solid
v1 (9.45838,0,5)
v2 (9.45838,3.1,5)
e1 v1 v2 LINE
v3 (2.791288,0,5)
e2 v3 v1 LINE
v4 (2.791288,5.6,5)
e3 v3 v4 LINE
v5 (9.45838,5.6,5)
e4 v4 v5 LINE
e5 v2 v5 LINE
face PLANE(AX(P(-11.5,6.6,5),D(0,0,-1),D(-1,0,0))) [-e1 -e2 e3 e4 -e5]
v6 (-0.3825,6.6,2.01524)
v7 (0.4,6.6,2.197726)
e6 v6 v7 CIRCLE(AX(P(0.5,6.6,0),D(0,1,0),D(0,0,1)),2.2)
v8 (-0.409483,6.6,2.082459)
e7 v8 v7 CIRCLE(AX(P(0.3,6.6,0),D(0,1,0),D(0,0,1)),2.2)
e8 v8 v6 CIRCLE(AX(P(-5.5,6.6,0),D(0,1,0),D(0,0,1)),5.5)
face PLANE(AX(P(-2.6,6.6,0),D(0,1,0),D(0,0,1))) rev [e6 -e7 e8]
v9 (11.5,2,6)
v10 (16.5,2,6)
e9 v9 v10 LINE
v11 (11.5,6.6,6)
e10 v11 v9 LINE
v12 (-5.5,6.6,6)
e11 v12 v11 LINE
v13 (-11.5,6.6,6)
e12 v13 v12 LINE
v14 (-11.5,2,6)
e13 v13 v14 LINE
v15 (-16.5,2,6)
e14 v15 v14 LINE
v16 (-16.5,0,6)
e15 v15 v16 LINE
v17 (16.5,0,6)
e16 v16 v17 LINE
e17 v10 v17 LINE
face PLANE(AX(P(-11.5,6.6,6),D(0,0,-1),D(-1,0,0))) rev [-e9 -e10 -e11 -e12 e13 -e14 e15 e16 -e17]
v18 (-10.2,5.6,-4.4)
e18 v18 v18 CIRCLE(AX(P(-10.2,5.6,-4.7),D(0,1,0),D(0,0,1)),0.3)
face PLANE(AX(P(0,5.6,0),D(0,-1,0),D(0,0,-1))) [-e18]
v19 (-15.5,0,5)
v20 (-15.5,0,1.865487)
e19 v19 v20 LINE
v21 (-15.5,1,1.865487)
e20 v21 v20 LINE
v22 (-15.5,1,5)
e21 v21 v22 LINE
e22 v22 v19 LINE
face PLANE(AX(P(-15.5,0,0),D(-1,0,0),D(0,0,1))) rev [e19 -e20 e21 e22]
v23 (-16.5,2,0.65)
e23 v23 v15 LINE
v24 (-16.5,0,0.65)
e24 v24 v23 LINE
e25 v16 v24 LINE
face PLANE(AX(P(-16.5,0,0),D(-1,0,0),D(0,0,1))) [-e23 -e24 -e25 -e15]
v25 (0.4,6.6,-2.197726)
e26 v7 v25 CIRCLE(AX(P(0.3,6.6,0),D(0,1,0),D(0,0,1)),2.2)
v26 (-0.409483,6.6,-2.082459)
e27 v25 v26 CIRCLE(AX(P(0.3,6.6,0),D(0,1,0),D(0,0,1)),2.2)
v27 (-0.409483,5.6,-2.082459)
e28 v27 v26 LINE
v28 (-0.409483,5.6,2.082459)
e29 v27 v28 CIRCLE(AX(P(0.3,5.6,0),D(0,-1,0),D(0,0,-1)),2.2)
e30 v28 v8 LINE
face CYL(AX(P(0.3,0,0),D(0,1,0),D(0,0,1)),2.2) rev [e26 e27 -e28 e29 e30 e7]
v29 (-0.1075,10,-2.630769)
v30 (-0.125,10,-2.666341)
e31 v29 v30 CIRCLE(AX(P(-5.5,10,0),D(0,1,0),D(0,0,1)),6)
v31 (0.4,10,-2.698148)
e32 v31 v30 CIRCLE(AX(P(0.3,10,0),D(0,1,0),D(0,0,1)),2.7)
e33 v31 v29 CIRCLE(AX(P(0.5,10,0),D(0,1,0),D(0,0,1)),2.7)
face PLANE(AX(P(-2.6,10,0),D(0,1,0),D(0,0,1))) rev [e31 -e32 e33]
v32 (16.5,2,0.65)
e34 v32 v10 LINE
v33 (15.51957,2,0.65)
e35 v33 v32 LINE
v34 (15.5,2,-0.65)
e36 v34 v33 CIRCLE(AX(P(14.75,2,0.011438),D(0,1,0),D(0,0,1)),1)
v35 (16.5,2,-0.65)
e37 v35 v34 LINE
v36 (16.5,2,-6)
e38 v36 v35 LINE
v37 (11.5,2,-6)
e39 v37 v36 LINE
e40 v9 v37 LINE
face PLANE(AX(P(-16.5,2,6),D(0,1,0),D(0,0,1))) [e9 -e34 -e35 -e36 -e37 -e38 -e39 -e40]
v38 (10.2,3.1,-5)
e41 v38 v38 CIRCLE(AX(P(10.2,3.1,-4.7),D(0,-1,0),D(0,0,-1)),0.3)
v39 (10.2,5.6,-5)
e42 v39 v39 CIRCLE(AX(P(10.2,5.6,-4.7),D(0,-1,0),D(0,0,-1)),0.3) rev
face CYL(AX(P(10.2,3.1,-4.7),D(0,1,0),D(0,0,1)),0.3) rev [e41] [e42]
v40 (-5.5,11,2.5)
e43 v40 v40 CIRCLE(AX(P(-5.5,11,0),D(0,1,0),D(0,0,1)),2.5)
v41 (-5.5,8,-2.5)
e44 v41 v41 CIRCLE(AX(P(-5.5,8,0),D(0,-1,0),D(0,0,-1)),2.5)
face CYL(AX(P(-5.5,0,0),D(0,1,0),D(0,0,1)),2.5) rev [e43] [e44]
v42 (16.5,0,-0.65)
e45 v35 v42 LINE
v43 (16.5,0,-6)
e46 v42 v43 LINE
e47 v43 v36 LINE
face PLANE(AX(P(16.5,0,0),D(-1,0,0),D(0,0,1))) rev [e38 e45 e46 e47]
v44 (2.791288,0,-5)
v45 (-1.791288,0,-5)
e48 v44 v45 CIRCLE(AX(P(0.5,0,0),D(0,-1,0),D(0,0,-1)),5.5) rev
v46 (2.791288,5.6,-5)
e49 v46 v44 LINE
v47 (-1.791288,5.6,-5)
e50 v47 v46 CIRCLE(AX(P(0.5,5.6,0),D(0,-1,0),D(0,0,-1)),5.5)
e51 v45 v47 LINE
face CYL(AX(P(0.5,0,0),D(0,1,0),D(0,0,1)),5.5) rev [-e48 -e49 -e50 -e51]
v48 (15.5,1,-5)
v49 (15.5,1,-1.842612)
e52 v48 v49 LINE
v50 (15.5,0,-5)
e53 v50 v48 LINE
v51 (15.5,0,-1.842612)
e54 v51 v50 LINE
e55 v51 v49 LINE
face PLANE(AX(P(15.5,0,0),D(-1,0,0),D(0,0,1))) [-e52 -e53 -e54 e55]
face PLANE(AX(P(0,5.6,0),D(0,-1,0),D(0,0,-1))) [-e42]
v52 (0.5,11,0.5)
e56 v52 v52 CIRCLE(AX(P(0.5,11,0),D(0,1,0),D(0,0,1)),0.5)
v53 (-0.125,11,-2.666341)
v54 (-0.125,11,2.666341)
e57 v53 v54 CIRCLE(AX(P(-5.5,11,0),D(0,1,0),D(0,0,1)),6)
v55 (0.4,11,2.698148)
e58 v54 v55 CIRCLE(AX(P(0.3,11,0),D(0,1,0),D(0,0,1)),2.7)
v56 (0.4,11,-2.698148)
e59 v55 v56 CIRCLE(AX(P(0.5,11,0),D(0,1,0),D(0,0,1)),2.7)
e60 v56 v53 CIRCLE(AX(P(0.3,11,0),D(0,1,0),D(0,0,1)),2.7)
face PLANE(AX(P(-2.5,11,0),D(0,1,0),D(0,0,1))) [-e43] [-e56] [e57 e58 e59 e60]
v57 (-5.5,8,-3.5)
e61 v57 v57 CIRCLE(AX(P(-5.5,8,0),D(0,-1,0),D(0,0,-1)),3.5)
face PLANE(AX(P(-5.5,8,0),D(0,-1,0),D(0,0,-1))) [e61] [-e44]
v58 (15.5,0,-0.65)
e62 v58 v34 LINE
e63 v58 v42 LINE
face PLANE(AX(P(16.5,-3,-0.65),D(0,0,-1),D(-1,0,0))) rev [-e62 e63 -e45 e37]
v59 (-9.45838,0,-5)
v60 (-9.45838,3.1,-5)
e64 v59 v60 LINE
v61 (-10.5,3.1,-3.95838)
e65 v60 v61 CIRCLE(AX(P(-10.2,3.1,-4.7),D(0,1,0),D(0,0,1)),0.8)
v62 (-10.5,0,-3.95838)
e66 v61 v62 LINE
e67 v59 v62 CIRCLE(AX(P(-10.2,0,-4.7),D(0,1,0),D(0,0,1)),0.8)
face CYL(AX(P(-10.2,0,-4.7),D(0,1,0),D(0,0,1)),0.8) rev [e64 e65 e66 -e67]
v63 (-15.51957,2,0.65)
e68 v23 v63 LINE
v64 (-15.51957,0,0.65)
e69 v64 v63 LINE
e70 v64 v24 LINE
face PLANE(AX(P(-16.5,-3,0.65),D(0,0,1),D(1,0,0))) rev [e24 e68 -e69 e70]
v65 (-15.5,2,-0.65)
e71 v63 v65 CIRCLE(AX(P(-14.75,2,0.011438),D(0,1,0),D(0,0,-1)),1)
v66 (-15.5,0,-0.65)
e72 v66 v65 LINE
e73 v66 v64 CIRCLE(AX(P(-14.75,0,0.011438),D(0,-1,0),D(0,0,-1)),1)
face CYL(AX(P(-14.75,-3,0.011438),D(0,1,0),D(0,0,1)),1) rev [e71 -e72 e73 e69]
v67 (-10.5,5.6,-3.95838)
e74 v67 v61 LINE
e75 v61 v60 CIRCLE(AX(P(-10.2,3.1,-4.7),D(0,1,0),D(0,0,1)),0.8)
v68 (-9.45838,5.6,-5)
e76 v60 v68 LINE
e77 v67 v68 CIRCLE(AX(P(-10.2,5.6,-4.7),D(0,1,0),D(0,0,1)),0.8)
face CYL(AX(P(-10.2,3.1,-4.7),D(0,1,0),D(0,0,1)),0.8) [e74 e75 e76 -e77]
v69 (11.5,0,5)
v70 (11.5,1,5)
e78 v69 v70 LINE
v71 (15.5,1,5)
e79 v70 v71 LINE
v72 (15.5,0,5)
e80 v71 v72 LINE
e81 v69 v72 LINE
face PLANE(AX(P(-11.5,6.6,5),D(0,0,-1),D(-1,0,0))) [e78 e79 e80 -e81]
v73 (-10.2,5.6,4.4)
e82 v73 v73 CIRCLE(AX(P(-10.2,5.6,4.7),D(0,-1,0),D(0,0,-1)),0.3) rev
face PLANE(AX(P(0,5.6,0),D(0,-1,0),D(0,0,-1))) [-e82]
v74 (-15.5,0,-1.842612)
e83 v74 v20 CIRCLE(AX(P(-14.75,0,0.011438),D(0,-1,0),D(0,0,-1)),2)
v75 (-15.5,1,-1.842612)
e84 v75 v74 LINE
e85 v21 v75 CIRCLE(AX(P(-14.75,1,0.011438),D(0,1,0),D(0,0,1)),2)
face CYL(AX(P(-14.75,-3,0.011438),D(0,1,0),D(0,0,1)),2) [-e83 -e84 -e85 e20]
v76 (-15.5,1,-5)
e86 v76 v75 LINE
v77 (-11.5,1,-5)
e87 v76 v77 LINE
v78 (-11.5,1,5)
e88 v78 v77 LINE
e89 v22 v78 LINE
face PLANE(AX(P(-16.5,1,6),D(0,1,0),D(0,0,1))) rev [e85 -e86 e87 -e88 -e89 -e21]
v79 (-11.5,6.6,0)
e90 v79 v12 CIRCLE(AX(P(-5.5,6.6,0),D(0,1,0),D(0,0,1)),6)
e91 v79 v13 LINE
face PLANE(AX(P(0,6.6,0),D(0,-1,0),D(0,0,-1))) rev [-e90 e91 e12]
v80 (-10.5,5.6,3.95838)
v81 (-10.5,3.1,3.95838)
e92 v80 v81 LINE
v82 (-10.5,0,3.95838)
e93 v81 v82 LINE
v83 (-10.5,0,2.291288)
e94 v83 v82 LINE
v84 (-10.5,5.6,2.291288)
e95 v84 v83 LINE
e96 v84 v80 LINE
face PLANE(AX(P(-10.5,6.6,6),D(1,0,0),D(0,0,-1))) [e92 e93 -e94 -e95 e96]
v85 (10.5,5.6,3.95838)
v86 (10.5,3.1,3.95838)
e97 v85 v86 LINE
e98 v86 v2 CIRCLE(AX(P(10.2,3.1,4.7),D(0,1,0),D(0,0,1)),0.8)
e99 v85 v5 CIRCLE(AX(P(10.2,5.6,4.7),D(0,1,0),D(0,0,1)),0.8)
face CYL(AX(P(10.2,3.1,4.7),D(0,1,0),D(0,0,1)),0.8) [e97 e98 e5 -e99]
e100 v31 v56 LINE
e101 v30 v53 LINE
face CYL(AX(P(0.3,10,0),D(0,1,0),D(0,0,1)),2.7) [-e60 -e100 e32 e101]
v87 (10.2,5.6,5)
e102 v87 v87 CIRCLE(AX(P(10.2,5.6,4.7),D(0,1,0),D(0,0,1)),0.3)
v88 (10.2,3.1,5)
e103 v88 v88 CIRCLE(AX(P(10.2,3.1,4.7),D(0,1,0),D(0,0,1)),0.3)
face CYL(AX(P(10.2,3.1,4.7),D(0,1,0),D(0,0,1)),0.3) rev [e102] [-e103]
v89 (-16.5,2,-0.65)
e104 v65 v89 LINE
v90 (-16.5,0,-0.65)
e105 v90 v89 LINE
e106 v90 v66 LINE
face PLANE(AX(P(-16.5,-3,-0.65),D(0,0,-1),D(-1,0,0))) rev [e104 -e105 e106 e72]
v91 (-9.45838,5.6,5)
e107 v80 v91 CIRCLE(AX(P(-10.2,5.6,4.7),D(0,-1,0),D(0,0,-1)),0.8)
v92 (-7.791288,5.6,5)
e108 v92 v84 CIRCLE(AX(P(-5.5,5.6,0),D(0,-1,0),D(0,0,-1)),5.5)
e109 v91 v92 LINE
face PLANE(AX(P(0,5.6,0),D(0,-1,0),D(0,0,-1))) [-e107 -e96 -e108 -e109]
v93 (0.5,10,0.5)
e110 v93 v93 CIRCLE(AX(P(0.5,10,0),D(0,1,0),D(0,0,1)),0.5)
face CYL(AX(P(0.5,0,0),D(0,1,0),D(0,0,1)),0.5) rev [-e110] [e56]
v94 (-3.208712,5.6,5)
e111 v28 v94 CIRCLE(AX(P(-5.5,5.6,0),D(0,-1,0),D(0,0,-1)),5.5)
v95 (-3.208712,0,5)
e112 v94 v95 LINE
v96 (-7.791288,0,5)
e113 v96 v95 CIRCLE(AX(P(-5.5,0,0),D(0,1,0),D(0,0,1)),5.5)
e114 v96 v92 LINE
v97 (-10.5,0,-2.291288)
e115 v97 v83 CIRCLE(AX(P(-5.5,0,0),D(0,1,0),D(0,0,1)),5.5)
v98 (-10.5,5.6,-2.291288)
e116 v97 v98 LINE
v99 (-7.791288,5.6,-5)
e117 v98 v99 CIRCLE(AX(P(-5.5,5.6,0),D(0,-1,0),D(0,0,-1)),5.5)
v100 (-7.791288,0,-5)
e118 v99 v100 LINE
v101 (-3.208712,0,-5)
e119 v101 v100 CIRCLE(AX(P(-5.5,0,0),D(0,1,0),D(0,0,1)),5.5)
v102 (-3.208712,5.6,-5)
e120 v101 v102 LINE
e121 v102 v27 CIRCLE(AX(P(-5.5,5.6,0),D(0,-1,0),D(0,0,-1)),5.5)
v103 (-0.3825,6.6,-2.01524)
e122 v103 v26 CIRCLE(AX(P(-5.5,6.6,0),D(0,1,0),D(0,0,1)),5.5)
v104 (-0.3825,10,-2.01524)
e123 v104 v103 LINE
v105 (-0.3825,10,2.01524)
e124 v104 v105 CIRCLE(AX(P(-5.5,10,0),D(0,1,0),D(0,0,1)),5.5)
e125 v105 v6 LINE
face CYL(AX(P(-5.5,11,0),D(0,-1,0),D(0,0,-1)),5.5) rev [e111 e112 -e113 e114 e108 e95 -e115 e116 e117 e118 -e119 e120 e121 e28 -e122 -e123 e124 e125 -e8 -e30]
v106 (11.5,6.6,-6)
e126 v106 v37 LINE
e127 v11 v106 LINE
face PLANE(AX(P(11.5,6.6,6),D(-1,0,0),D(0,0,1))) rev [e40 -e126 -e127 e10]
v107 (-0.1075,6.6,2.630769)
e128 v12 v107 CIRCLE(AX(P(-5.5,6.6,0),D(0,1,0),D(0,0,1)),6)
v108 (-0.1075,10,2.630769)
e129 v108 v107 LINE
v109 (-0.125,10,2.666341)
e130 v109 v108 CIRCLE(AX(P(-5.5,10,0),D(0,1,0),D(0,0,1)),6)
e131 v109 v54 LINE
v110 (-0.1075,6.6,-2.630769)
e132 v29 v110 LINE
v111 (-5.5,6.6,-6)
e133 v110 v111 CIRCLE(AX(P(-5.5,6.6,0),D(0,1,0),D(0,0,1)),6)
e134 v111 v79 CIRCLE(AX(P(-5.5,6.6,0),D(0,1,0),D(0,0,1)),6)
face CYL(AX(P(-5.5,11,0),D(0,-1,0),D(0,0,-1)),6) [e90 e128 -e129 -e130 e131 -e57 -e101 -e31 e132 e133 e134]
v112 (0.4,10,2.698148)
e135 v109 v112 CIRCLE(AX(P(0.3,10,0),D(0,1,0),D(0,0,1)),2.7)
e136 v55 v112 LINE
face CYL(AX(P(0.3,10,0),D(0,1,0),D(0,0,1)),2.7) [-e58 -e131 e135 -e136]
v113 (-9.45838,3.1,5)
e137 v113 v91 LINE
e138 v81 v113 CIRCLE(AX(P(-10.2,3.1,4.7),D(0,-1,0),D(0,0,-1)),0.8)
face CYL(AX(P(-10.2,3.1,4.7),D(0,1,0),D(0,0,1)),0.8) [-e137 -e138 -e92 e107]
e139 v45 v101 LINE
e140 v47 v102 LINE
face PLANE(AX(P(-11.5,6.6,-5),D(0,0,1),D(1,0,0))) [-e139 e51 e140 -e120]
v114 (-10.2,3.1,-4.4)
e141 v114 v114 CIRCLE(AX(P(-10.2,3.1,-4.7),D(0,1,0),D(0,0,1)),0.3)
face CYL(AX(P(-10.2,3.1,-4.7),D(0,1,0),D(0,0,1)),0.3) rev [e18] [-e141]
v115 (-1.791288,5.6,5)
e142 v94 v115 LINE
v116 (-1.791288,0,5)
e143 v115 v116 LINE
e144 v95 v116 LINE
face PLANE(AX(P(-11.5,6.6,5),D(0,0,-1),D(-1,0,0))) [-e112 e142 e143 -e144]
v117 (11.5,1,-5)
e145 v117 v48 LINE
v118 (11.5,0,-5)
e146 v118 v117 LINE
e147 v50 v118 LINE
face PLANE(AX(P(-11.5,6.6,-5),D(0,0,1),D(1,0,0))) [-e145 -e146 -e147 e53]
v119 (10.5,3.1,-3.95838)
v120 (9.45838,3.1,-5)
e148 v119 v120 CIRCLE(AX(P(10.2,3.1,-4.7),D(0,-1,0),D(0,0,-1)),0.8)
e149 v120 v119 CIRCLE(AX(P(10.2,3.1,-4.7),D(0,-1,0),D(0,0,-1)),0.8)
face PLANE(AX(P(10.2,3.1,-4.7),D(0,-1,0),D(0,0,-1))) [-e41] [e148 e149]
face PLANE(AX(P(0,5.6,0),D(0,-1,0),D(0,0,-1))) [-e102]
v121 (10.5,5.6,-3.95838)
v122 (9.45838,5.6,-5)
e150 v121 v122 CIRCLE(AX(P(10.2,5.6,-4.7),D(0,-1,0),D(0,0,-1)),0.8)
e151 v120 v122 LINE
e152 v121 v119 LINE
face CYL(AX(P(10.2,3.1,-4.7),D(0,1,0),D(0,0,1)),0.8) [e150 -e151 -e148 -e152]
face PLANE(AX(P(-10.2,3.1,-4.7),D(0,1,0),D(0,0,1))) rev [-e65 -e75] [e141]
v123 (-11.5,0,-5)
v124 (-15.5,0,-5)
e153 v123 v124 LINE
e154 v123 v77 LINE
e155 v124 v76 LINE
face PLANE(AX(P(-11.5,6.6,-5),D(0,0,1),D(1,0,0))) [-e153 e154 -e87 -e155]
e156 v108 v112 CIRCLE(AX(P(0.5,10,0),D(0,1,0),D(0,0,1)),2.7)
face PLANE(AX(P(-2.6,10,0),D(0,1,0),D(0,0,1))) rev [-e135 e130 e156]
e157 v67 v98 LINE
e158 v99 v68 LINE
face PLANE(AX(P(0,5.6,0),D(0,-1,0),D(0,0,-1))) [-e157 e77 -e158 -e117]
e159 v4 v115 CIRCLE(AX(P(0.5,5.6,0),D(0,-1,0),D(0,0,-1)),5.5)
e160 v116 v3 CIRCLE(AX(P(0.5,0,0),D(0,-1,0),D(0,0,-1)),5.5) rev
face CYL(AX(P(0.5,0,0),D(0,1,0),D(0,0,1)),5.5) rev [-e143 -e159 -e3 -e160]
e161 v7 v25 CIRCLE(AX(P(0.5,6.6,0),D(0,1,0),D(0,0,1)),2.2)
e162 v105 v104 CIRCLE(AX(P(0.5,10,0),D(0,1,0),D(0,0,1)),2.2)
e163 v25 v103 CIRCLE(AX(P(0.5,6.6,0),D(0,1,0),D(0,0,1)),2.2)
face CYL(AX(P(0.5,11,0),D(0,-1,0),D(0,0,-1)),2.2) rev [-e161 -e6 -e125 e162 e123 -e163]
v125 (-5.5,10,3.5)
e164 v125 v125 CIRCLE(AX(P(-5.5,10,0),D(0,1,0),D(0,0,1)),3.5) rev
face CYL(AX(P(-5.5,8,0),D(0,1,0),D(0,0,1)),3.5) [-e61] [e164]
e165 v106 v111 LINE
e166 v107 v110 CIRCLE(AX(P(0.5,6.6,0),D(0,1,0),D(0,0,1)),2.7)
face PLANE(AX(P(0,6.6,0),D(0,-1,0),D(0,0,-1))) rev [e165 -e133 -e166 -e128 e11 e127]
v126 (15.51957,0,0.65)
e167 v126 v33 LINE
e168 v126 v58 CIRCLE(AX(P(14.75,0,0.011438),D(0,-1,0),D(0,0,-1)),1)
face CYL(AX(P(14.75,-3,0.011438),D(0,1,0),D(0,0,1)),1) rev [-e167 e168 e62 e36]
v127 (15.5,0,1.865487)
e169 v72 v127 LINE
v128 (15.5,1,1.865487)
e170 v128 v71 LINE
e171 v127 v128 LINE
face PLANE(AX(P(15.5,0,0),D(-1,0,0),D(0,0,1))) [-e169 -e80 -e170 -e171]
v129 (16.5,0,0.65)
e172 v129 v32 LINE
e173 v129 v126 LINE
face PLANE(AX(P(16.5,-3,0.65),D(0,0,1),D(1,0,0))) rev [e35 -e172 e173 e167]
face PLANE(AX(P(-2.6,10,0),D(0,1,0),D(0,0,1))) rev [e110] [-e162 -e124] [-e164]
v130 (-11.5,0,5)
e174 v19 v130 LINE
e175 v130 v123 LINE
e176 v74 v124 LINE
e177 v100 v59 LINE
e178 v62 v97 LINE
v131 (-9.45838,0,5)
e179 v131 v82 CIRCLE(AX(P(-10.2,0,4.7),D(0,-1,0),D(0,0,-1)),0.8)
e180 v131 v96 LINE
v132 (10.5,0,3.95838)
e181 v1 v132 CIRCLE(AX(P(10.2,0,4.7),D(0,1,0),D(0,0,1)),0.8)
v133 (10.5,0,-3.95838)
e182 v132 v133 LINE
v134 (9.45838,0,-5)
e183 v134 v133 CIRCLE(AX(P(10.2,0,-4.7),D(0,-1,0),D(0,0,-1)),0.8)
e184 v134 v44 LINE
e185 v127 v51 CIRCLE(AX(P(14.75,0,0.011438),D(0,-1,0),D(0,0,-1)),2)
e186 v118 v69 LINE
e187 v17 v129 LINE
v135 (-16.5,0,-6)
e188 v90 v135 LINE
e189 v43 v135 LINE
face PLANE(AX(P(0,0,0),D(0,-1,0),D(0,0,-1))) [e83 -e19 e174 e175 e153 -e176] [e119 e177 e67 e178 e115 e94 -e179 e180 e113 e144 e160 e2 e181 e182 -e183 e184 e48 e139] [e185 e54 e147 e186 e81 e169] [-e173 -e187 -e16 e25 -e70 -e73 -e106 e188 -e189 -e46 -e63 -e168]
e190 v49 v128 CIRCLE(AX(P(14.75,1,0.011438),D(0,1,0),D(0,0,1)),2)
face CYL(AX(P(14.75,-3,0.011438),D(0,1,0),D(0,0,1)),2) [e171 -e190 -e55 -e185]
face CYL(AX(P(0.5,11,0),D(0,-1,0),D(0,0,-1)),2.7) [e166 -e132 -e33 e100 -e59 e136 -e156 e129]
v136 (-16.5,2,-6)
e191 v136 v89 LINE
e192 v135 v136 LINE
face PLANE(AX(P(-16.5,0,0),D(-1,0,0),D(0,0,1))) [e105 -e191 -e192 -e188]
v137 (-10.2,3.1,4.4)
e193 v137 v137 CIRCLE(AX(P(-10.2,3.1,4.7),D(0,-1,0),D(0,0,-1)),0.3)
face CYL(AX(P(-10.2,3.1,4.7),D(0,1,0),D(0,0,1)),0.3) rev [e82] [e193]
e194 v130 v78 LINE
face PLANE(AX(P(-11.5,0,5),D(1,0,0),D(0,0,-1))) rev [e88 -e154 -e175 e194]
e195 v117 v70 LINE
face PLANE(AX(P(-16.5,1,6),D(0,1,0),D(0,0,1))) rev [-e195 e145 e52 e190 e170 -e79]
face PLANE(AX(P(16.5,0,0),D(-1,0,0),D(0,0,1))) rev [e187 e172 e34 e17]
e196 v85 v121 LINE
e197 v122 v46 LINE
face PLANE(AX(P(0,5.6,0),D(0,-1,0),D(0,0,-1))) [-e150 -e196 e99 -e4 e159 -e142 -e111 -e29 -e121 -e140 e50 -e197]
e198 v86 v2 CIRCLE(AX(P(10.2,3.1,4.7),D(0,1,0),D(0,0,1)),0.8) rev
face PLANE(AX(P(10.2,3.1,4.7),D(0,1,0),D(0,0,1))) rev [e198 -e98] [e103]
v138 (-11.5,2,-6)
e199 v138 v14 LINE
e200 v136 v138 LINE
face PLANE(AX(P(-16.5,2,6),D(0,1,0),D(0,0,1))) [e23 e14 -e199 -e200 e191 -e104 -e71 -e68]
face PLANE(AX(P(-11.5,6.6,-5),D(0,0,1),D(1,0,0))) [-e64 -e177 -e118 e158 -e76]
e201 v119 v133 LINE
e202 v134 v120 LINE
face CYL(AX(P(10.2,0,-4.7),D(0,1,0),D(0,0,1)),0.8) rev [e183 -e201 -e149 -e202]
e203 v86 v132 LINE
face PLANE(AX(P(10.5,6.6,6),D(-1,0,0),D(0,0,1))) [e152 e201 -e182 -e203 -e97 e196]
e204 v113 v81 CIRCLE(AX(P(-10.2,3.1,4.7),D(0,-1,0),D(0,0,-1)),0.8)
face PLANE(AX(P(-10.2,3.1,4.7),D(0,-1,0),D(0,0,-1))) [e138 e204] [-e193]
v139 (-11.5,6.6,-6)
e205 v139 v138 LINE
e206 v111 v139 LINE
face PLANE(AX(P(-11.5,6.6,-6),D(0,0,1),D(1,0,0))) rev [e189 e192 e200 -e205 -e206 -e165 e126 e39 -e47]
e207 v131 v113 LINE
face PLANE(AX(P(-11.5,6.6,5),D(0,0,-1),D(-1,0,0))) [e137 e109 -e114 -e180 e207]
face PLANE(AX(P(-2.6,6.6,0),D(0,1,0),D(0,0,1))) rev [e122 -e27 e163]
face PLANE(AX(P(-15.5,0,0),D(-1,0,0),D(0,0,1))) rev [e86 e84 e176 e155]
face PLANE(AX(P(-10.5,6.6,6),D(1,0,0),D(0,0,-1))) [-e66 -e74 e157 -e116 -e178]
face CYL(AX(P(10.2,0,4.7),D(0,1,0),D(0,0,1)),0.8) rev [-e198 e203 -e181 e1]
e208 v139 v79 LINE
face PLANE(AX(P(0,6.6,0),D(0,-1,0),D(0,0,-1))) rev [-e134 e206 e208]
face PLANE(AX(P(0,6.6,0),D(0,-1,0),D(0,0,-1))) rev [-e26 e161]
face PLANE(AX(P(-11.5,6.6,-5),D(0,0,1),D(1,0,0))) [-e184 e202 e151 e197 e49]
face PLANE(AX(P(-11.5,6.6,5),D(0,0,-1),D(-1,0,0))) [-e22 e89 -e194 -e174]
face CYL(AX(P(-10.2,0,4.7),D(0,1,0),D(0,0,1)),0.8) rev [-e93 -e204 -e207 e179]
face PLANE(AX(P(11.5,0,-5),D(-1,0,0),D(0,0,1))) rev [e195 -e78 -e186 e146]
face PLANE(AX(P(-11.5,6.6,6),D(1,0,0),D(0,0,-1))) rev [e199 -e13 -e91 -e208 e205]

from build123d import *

# Parameters (mm, degrees)
SKETCH1_W                = 23
SKETCH1_H                = 12
BOSS_EXTRUDE1_DEPTH      = 6.6
BOSS_EXTRUDE2_DEPTH      = 5
BOSS_EXTRUDE2_DEPTH_BACK = 28
SKETCH2_W                = 12
SKETCH2_H                = 2
CUT_EXTRUDE1_DEPTH       = 5
SHELL3_OUTLINE_W         = 21
SHELL3_OUTLINE_H         = 10
SHELL3_DEPTH             = 5.6
SHELL3_2_DEPTH           = 1
SKETCH5_W                = 1
SKETCH5_H                = 10
BOSS_EXTRUDE4_DEPTH      = 1
SKETCH5_3_W              = 1
SKETCH5_3_H              = 10
BOSS_EXTRUDE5_DEPTH      = 1
BOSS_EXTRUDE6_DEPTH      = 4.4
CUT_EXTRUDE2_DEPTH       = 19.756598839
BOSS_EXTRUDE7_START      = -1
BOSS_EXTRUDE7_DEPTH      = 1
SKETCH21_R               = 2.5
SKETCH21_R_2             = 0.5
CUT_EXTRUDE3_DEPTH       = 21.718349355
SKETCH22_R               = 5.5
SKETCH22_R_2             = 0.8
CUT_EXTRUDE4_DEPTH       = 19.42851052
SKETCH23_R               = 0.8
SKETCH23_R_2             = 0.3
BOSS_EXTRUDE9_DEPTH      = 2.5
SKETCH25_R               = 3.5
SKETCH25_R_2             = 2.5
BOSS_EXTRUDE10_DEPTH     = 2


# Read off the part's stored shape, not the designer's step: Shell3
with BuildPart() as part:
    # Sketch1 → Boss-Extrude1 (new body)
    with BuildSketch(Plane(origin=(0, 0, 0), x_dir=(1, 0, 0), z_dir=(0, 1, 0))):
        Rectangle(SKETCH1_W, SKETCH1_H)
    extrude(amount=BOSS_EXTRUDE1_DEPTH)

    # Sketch2 → Boss-Extrude2 (add, two sides: drawn at the far end of the back side and taken through both)
    with BuildSketch(Plane(origin=(11.5, 0, 0), x_dir=(0, 0, -1), z_dir=(1, 0, 0)).offset(-BOSS_EXTRUDE2_DEPTH_BACK)):
        with Locations((0, 1)):
            Rectangle(SKETCH2_W, SKETCH2_H)
    extrude(amount=BOSS_EXTRUDE2_DEPTH + BOSS_EXTRUDE2_DEPTH_BACK)

    # Sketch3 → Cut-Extrude1 (cut)
    with BuildSketch(Plane(origin=(0, 2, 0), x_dir=(1, 0, 0), z_dir=(0, 1, 0))):
        with BuildLine():
            Line((16.5, 0.65), (15.5, 0.65))
            ThreePointArc((15.5, 0.65), (13.750113293, -0.026490152), (15.519570239, -0.65))
            Line((15.519570239, -0.65), (16.5, -0.65))
            Line((16.5, -0.65), (16.5, 0.65))
        make_face()
        with BuildLine():
            Line((-16.5, -0.65), (-16.5, 0.65))
            Line((-16.5, 0.65), (-15.5, 0.65))
            ThreePointArc((-15.5, 0.65), (-13.750113293, -0.026490152), (-15.519570239, -0.65))
            Line((-15.519570239, -0.65), (-16.5, -0.65))
        make_face()
    extrude(amount=-CUT_EXTRUDE1_DEPTH, mode=Mode.SUBTRACT)

    # Shell3 outline → Shell3 (cut)
    with BuildSketch(Plane(origin=(0, 0, 0), x_dir=(1, 0, 0), z_dir=(0, 1, 0))):
        Rectangle(SHELL3_OUTLINE_W, SHELL3_OUTLINE_H)
    extrude(amount=SHELL3_DEPTH, mode=Mode.SUBTRACT)

    # Shell3 2 outline → Shell3 2 (cut)
    with BuildSketch(Plane(origin=(0, 0, 0), x_dir=(1, 0, 0), z_dir=(0, 1, 0))):
        with BuildLine():
            ThreePointArc((-15.5, 1.842611794), (-12.75, -0.011437828), (-15.5, -1.86548745))
            Line((-15.5, -1.86548745), (-15.5, -5))
            Line((-15.5, -5), (-10.5, -5))
            Line((-10.5, -5), (-10.5, 5))
            Line((-10.5, 5), (-15.5, 5))
            Line((-15.5, 5), (-15.5, 1.842611794))
        make_face()
        with BuildLine():
            Line((10.5, 5), (10.5, -5))
            Line((10.5, -5), (15.5, -5))
            Line((15.5, -5), (15.5, -1.86548745))
            ThreePointArc((15.5, -1.86548745), (12.75, -0.011437828), (15.5, 1.842611794))
            Line((15.5, 1.842611794), (15.5, 5))
            Line((15.5, 5), (10.5, 5))
        make_face()
    extrude(amount=SHELL3_2_DEPTH, mode=Mode.SUBTRACT)

    # Sketch5 → Boss-Extrude4 (add)
    with BuildSketch(Plane.XZ.offset(-1)):
        with Locations((11, 0)):
            Rectangle(SKETCH5_W, SKETCH5_H)
    extrude(amount=BOSS_EXTRUDE4_DEPTH)

    # Sketch5<3> → Boss-Extrude5 (add)
    with BuildSketch(Plane.XZ.offset(-1)):
        with Locations((11, 0)):
            Rectangle(SKETCH5_3_W, SKETCH5_3_H)
        with Locations((-11, 0)):
            Rectangle(SKETCH5_3_W, SKETCH5_3_H)
    extrude(amount=BOSS_EXTRUDE5_DEPTH)

    # Sketch7 → Boss-Extrude6 (add)
    with BuildSketch(Plane(origin=(0, 6.6, 0), x_dir=(1, 0, 0), z_dir=(0, 1, 0))):
        with BuildLine():
            ThreePointArc((-0.1075, 2.630768661), (-11.5, 0), (-0.1075, -2.630768661))
            ThreePointArc((-0.1075, -2.630768661), (3.2, 0), (-0.1075, 2.630768661))
        make_face()
        with BuildLine():
            ThreePointArc((-0.3825, -2.01524037), (2.7, 0), (-0.3825, 2.01524037))
            ThreePointArc((-0.3825, 2.01524037), (-11, 0), (-0.3825, -2.01524037))
        make_face(mode=Mode.SUBTRACT)
    extrude(amount=BOSS_EXTRUDE6_DEPTH)

    # Sketch19 → Cut-Extrude2 (cut, through all)
    with BuildSketch(Plane(origin=(0, 6.6, 0), x_dir=(1, 0, 0), z_dir=(0, 1, 0))):
        with BuildLine():
            ThreePointArc((-0.409482759, 2.082458695), (-11, 0), (-0.409482759, -2.082458695))
            ThreePointArc((-0.409482759, -2.082458695), (2.5, 0), (-0.409482759, 2.082458695))
        make_face()
    extrude(amount=-CUT_EXTRUDE2_DEPTH, mode=Mode.SUBTRACT)

    # Sketch20 → Boss-Extrude7 (add)
    with BuildSketch(Plane(origin=(0, 11, 0), x_dir=(1, 0, 0), z_dir=(0, 1, 0)).offset(BOSS_EXTRUDE7_START)):
        with BuildLine():
            ThreePointArc((-0.125, 2.666341126), (-11.5, 0), (-0.125, -2.666341126))
            ThreePointArc((-0.125, -2.666341126), (3, 0), (-0.125, 2.666341126))
        make_face()
    extrude(amount=BOSS_EXTRUDE7_DEPTH)

    # Sketch21 → Cut-Extrude3 (cut, through all)
    with BuildSketch(Plane(origin=(0, 11, 0), x_dir=(1, 0, 0), z_dir=(0, 1, 0))):
        with Locations(Location((-5.5, 0, 0), (0, 0, 270))):
            Circle(SKETCH21_R)
        with Locations(Location((0.5, 0, 0), (0, 0, 270))):
            Circle(SKETCH21_R_2)
    extrude(amount=-CUT_EXTRUDE3_DEPTH, mode=Mode.SUBTRACT)

    # Sketch22 → Cut-Extrude4 (cut, through all)
    with BuildSketch(Plane.XZ.offset(-5.6)):
        with Locations((0.5, 0)):
            Circle(SKETCH22_R)
        with Locations((-10.2, 4.7)):
            Circle(SKETCH22_R_2)
        with Locations((-10.2, -4.7)):
            Circle(SKETCH22_R_2)
        with Locations((10.2, -4.7)):
            Circle(SKETCH22_R_2)
        with Locations((10.2, 4.7)):
            Circle(SKETCH22_R_2)
    extrude(amount=CUT_EXTRUDE4_DEPTH, mode=Mode.SUBTRACT)

    # Sketch23 → Boss-Extrude9 (add)
    # profile 1 of 4: a face of its own
    with BuildSketch(Plane.XZ.offset(-5.6)):
        with Locations((-10.2, 4.7)):
            Circle(SKETCH23_R)
        with Locations(Location((-10.2, 4.7, 0), (0, 0, 270))):
            Circle(SKETCH23_R_2, mode=Mode.SUBTRACT)
    # profile 2 of 4: a face of its own
    with BuildSketch(Plane.XZ.offset(-5.6)):
        with Locations((-10.2, -4.7)):
            Circle(SKETCH23_R)
        with Locations(Location((-10.2, -4.7, 0), (0, 0, 90))):
            Circle(SKETCH23_R_2, mode=Mode.SUBTRACT)
    # profile 3 of 4: a face of its own
    with BuildSketch(Plane.XZ.offset(-5.6)):
        with Locations((10.2, -4.7)):
            Circle(SKETCH23_R)
        with Locations(Location((10.2, -4.7, 0), (0, 0, 270))):
            Circle(SKETCH23_R_2, mode=Mode.SUBTRACT)
    # profile 4 of 4: a face of its own
    with BuildSketch(Plane.XZ.offset(-5.6)):
        with Locations((10.2, 4.7)):
            Circle(SKETCH23_R)
        with Locations(Location((10.2, 4.7, 0), (0, 0, 90))):
            Circle(SKETCH23_R_2, mode=Mode.SUBTRACT)
    extrude(amount=BOSS_EXTRUDE9_DEPTH)

    # Sketch25 → Boss-Extrude10 (add)
    with BuildSketch(Plane.XZ.offset(-10)):
        with Locations(Location((-5.5, 0, 0), (0, 0, 90))):
            Circle(SKETCH25_R)
        with Locations(Location((-5.5, 0, 0), (0, 0, 90))):
            Circle(SKETCH25_R_2, mode=Mode.SUBTRACT)
    extrude(amount=BOSS_EXTRUDE10_DEPTH)


solid = part.part
